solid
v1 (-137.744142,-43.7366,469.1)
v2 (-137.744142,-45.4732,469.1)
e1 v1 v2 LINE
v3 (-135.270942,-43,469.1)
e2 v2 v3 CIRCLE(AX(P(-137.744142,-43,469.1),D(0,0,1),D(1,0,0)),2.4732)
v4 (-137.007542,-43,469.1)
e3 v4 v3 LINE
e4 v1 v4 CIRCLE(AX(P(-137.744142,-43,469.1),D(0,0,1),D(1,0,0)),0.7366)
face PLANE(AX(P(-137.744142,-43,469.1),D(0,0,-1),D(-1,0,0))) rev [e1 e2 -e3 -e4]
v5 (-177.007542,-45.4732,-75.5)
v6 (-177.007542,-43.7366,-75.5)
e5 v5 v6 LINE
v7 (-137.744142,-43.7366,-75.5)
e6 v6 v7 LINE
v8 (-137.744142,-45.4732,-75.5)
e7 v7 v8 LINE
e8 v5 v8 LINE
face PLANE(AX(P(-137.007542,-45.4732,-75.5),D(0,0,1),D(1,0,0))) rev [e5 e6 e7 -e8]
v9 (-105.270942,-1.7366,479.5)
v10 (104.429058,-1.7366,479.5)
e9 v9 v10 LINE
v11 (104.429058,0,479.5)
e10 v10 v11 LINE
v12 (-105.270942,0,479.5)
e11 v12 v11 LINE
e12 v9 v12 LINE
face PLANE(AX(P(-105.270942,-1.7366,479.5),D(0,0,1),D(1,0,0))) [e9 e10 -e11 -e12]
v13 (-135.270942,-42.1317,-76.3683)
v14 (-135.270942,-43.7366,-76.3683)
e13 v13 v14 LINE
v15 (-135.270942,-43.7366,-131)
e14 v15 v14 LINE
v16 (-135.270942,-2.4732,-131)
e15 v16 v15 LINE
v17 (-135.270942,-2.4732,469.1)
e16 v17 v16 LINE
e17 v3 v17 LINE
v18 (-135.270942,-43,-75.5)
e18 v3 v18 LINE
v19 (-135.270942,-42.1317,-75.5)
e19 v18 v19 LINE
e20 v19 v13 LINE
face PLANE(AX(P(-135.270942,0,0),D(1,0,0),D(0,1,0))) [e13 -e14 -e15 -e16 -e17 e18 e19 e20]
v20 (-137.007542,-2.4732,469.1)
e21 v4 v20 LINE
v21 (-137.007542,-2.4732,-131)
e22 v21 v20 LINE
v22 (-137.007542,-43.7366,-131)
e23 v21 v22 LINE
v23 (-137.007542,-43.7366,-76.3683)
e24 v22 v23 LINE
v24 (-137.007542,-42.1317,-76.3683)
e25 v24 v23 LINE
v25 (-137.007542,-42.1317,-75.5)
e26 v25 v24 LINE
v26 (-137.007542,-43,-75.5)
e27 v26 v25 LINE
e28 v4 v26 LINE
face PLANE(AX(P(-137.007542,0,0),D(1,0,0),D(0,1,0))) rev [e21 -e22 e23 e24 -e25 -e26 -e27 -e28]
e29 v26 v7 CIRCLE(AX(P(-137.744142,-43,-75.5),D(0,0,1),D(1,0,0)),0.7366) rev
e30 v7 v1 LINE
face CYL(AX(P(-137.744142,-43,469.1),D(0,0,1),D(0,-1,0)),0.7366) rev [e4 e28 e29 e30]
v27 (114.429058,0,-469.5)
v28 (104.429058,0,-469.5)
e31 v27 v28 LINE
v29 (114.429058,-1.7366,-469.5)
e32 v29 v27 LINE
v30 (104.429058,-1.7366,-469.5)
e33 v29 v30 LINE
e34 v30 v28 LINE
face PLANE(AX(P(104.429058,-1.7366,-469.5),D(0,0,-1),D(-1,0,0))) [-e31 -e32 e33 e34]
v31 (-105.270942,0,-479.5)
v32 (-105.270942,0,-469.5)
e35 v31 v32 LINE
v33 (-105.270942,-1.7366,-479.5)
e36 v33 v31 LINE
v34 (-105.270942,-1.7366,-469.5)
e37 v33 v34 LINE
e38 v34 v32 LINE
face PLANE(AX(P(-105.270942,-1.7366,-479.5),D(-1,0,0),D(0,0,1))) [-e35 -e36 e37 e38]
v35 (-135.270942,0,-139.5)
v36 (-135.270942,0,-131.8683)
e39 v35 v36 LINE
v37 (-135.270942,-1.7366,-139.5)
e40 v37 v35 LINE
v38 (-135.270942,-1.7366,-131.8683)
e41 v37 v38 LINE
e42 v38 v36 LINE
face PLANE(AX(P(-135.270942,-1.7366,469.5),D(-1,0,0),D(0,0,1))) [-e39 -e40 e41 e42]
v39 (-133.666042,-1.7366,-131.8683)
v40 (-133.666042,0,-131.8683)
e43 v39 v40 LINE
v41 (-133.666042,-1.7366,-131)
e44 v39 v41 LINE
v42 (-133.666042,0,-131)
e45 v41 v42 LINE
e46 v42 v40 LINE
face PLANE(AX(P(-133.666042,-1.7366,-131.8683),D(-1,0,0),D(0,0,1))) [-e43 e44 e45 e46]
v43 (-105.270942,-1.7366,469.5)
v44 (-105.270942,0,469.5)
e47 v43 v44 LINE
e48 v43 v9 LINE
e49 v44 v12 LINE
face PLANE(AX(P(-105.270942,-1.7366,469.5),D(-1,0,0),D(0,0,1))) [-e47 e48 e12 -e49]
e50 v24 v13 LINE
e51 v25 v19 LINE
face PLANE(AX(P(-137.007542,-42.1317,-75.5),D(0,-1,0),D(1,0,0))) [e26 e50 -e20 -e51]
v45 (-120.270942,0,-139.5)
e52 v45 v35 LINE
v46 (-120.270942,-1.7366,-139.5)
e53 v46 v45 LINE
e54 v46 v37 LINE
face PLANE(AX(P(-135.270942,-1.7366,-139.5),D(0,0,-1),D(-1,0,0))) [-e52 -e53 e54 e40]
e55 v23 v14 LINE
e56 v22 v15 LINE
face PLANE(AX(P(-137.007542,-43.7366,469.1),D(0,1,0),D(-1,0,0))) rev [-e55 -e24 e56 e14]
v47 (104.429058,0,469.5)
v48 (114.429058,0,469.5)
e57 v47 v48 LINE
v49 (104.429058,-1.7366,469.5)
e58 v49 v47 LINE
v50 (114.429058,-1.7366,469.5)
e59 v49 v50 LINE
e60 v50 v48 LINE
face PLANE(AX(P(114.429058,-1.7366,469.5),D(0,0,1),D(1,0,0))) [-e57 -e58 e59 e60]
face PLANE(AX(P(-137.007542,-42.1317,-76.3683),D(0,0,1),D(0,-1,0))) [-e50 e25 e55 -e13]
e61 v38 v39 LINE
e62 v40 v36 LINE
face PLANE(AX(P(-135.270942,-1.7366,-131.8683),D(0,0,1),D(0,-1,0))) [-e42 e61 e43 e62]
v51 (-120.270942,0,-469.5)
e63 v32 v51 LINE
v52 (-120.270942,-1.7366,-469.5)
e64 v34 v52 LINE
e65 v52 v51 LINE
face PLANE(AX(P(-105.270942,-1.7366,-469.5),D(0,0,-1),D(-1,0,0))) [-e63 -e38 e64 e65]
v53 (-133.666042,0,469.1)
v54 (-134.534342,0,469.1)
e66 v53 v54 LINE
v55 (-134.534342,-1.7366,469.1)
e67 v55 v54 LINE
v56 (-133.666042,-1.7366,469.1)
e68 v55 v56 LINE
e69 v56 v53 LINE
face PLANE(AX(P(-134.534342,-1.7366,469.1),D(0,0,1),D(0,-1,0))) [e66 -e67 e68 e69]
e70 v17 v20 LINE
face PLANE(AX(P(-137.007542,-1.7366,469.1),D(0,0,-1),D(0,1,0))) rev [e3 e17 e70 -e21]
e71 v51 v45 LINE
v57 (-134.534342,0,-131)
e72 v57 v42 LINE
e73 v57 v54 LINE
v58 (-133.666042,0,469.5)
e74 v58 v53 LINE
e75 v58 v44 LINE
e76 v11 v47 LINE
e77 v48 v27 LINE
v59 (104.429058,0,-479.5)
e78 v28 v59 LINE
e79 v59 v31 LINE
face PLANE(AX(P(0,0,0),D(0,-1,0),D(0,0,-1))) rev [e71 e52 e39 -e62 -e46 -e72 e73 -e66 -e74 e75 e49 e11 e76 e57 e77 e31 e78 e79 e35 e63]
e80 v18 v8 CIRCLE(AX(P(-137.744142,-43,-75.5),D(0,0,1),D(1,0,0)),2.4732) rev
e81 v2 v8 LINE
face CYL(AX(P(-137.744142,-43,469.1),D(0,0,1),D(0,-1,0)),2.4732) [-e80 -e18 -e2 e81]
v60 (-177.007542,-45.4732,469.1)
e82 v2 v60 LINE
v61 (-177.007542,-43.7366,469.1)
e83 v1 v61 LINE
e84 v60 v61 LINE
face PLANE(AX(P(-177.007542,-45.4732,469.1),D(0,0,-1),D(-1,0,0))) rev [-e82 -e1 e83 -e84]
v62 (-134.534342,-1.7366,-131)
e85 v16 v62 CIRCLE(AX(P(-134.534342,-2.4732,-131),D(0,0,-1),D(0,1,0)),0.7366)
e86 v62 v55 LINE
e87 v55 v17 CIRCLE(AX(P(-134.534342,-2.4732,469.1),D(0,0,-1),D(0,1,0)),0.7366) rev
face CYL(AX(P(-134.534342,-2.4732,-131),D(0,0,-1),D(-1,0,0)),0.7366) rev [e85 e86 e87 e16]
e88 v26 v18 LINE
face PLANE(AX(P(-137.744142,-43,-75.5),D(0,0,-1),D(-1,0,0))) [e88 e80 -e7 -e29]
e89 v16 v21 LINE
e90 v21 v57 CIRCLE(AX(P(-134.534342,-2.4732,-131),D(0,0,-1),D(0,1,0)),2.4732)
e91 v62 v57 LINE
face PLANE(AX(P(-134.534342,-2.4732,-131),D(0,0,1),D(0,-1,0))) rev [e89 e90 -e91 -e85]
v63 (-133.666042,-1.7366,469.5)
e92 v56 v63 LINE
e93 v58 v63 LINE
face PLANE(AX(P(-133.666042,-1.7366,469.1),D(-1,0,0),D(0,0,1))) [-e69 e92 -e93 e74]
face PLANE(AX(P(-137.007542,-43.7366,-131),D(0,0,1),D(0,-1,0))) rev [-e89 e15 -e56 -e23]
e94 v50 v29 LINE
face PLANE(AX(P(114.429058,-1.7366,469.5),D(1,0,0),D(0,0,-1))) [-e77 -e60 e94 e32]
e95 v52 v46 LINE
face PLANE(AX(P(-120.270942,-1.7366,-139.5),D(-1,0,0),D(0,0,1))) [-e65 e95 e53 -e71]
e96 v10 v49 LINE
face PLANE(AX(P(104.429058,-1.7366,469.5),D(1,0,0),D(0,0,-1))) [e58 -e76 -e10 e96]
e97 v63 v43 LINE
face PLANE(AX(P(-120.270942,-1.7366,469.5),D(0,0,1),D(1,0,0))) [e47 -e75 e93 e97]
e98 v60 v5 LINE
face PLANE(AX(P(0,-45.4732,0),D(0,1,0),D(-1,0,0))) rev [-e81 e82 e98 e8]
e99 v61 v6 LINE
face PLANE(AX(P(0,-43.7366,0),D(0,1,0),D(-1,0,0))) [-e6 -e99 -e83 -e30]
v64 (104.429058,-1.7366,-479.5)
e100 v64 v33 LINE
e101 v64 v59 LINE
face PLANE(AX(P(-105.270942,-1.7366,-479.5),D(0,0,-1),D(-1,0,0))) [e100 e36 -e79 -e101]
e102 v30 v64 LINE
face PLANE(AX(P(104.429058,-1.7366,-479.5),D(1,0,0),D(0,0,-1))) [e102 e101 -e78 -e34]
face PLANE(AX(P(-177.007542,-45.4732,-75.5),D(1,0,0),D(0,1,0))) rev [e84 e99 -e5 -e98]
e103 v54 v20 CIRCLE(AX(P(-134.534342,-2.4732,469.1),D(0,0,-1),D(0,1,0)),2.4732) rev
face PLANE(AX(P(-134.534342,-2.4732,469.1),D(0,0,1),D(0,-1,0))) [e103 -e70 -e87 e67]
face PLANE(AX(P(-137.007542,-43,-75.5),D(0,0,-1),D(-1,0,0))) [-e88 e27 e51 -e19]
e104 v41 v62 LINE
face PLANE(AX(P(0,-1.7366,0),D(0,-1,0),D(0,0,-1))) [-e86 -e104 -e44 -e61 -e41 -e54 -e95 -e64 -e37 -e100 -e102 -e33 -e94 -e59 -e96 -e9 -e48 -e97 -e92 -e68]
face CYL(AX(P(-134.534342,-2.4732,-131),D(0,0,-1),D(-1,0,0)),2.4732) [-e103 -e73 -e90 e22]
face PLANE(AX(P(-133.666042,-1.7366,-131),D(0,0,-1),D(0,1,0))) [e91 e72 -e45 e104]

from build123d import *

# Parameters (mm, degrees)
BASE_FLANGE1_DEPTH            = 1.7366
EDGE_FLANGE1_STRIP_W          = 8.4196
EDGE_FLANGE1_STRIP_H          = 1.7366
EDGE_FLANGE1_STRIP_CUT_DEPTH  = 600.1
EDGE_FLANGE1_RELIEF_W         = 9.2879
EDGE_FLANGE1_RELIEF_H         = 0.8683
EDGE_FLANGE1_RELIEF_CUT_DEPTH = 1.7366
EDGE_FLANGE1_DEPTH            = 600.1
EDGE_FLANGE2_STRIP_W          = 8.4196
EDGE_FLANGE2_STRIP_H          = 1.7366
EDGE_FLANGE2_STRIP_CUT_DEPTH  = 544.6
EDGE_FLANGE2_RELIEF_W         = 9.2879
EDGE_FLANGE2_RELIEF_H         = 0.8683
EDGE_FLANGE2_RELIEF_CUT_DEPTH = 1.7366
EDGE_FLANGE2_DEPTH            = 544.6


# Sheet-metal steps are written as plain solids
with BuildPart() as part:
    # Sketch1 → Base-Flange1 (new body)
    with BuildSketch(Plane(origin=(0, 0, 0), x_dir=(1, 0, 0), z_dir=(0, 1, 0))):
        Polygon((-105.270941838, 479.5), (-105.270941838, 469.5), (-120.270941838, 469.5), (-120.270941838, 139.5), (-135.270941838, 139.5), (-135.270941838, -469.5), (-120.270941838, -469.5), (-105.270941838, -469.5), (-105.270941838, -479.5), (104.429058162, -479.5), (104.429058162, -469.5), (114.429058162, -469.5), (114.429058162, 469.5), (104.429058162, 469.5), (104.429058162, 479.5), align=None)
    extrude(amount=-BASE_FLANGE1_DEPTH)

    # Edge-Flange1 strip (across the edge) → Edge-Flange1 strip cut (cut)
    with BuildSketch(Plane(origin=(-135.270941838, -1.7366, 469.1), x_dir=(1, 0, 0), z_dir=(0, 0, -1))):
        with Locations((-3.4732, -0.8683)):
            Rectangle(EDGE_FLANGE1_STRIP_W, EDGE_FLANGE1_STRIP_H)
    extrude(amount=EDGE_FLANGE1_STRIP_CUT_DEPTH, mode=Mode.SUBTRACT)

    # Edge-Flange1 relief (on the sheet) → Edge-Flange1 relief cut (cut)
    with BuildSketch(Plane(origin=(-134.534341838, -1.7366, 469.1), x_dir=(1, 0, 0), z_dir=(0, -1, 0))):
        with Locations((-3.77565, 0.43415)):
            Rectangle(EDGE_FLANGE1_RELIEF_W, EDGE_FLANGE1_RELIEF_H)
        with Locations((-3.77565, -600.53415)):
            Rectangle(EDGE_FLANGE1_RELIEF_W, EDGE_FLANGE1_RELIEF_H)
    extrude(amount=-EDGE_FLANGE1_RELIEF_CUT_DEPTH, mode=Mode.SUBTRACT)

    # Edge-Flange1 section (across the edge) → Edge-Flange1 (add)
    with BuildSketch(Plane(origin=(-135.270941838, -1.7366, 469.1), x_dir=(1, 0, 0), z_dir=(0, 0, -1))):
        with BuildLine():
            Line((-1.7366, 0.7366), (-1.7366, 42))
            Line((-1.7366, 42), (0, 42))
            Line((0, 42), (0, 0.7366))
            ThreePointArc((0, 0.7366), (0.215745145, 0.215745145), (0.7366, 0))
            Line((0.7366, 0), (0.7366, -1.7366))
            ThreePointArc((0.7366, -1.7366), (-1.012216491, -1.012216491), (-1.7366, 0.7366))
        make_face()
    extrude(amount=EDGE_FLANGE1_DEPTH)

    # Edge-Flange2 strip (across the edge) → Edge-Flange2 strip cut (cut)
    with BuildSketch(Plane(origin=(-137.007541838, -43.7366, -75.5), x_dir=(0, 1, 0), z_dir=(0, 0, 1))):
        with Locations((-3.4732, -0.8683)):
            Rectangle(EDGE_FLANGE2_STRIP_W, EDGE_FLANGE2_STRIP_H)
    extrude(amount=EDGE_FLANGE2_STRIP_CUT_DEPTH, mode=Mode.SUBTRACT)

    # Edge-Flange2 relief (on the sheet) → Edge-Flange2 relief cut (cut)
    with BuildSketch(Plane(origin=(-137.007541838, -43, -75.5), x_dir=(0, 1, 0), z_dir=(-1, 0, 0))):
        with Locations((-3.77565, 0.43415)):
            Rectangle(EDGE_FLANGE2_RELIEF_W, EDGE_FLANGE2_RELIEF_H)
    extrude(amount=-EDGE_FLANGE2_RELIEF_CUT_DEPTH, mode=Mode.SUBTRACT)

    # Edge-Flange2 section (across the edge) → Edge-Flange2 (add)
    with BuildSketch(Plane(origin=(-137.007541838, -43.7366, -75.5), x_dir=(0, 1, 0), z_dir=(0, 0, 1))):
        with BuildLine():
            Line((-1.7366, 0.7366), (-1.7366, 40))
            Line((-1.7366, 40), (0, 40))
            Line((0, 40), (0, 0.7366))
            ThreePointArc((0, 0.7366), (0.215745145, 0.215745145), (0.7366, 0))
            Line((0.7366, 0), (0.7366, -1.7366))
            ThreePointArc((0.7366, -1.7366), (-1.012216491, -1.012216491), (-1.7366, 0.7366))
        make_face()
    extrude(amount=EDGE_FLANGE2_DEPTH)


solid = part.part
